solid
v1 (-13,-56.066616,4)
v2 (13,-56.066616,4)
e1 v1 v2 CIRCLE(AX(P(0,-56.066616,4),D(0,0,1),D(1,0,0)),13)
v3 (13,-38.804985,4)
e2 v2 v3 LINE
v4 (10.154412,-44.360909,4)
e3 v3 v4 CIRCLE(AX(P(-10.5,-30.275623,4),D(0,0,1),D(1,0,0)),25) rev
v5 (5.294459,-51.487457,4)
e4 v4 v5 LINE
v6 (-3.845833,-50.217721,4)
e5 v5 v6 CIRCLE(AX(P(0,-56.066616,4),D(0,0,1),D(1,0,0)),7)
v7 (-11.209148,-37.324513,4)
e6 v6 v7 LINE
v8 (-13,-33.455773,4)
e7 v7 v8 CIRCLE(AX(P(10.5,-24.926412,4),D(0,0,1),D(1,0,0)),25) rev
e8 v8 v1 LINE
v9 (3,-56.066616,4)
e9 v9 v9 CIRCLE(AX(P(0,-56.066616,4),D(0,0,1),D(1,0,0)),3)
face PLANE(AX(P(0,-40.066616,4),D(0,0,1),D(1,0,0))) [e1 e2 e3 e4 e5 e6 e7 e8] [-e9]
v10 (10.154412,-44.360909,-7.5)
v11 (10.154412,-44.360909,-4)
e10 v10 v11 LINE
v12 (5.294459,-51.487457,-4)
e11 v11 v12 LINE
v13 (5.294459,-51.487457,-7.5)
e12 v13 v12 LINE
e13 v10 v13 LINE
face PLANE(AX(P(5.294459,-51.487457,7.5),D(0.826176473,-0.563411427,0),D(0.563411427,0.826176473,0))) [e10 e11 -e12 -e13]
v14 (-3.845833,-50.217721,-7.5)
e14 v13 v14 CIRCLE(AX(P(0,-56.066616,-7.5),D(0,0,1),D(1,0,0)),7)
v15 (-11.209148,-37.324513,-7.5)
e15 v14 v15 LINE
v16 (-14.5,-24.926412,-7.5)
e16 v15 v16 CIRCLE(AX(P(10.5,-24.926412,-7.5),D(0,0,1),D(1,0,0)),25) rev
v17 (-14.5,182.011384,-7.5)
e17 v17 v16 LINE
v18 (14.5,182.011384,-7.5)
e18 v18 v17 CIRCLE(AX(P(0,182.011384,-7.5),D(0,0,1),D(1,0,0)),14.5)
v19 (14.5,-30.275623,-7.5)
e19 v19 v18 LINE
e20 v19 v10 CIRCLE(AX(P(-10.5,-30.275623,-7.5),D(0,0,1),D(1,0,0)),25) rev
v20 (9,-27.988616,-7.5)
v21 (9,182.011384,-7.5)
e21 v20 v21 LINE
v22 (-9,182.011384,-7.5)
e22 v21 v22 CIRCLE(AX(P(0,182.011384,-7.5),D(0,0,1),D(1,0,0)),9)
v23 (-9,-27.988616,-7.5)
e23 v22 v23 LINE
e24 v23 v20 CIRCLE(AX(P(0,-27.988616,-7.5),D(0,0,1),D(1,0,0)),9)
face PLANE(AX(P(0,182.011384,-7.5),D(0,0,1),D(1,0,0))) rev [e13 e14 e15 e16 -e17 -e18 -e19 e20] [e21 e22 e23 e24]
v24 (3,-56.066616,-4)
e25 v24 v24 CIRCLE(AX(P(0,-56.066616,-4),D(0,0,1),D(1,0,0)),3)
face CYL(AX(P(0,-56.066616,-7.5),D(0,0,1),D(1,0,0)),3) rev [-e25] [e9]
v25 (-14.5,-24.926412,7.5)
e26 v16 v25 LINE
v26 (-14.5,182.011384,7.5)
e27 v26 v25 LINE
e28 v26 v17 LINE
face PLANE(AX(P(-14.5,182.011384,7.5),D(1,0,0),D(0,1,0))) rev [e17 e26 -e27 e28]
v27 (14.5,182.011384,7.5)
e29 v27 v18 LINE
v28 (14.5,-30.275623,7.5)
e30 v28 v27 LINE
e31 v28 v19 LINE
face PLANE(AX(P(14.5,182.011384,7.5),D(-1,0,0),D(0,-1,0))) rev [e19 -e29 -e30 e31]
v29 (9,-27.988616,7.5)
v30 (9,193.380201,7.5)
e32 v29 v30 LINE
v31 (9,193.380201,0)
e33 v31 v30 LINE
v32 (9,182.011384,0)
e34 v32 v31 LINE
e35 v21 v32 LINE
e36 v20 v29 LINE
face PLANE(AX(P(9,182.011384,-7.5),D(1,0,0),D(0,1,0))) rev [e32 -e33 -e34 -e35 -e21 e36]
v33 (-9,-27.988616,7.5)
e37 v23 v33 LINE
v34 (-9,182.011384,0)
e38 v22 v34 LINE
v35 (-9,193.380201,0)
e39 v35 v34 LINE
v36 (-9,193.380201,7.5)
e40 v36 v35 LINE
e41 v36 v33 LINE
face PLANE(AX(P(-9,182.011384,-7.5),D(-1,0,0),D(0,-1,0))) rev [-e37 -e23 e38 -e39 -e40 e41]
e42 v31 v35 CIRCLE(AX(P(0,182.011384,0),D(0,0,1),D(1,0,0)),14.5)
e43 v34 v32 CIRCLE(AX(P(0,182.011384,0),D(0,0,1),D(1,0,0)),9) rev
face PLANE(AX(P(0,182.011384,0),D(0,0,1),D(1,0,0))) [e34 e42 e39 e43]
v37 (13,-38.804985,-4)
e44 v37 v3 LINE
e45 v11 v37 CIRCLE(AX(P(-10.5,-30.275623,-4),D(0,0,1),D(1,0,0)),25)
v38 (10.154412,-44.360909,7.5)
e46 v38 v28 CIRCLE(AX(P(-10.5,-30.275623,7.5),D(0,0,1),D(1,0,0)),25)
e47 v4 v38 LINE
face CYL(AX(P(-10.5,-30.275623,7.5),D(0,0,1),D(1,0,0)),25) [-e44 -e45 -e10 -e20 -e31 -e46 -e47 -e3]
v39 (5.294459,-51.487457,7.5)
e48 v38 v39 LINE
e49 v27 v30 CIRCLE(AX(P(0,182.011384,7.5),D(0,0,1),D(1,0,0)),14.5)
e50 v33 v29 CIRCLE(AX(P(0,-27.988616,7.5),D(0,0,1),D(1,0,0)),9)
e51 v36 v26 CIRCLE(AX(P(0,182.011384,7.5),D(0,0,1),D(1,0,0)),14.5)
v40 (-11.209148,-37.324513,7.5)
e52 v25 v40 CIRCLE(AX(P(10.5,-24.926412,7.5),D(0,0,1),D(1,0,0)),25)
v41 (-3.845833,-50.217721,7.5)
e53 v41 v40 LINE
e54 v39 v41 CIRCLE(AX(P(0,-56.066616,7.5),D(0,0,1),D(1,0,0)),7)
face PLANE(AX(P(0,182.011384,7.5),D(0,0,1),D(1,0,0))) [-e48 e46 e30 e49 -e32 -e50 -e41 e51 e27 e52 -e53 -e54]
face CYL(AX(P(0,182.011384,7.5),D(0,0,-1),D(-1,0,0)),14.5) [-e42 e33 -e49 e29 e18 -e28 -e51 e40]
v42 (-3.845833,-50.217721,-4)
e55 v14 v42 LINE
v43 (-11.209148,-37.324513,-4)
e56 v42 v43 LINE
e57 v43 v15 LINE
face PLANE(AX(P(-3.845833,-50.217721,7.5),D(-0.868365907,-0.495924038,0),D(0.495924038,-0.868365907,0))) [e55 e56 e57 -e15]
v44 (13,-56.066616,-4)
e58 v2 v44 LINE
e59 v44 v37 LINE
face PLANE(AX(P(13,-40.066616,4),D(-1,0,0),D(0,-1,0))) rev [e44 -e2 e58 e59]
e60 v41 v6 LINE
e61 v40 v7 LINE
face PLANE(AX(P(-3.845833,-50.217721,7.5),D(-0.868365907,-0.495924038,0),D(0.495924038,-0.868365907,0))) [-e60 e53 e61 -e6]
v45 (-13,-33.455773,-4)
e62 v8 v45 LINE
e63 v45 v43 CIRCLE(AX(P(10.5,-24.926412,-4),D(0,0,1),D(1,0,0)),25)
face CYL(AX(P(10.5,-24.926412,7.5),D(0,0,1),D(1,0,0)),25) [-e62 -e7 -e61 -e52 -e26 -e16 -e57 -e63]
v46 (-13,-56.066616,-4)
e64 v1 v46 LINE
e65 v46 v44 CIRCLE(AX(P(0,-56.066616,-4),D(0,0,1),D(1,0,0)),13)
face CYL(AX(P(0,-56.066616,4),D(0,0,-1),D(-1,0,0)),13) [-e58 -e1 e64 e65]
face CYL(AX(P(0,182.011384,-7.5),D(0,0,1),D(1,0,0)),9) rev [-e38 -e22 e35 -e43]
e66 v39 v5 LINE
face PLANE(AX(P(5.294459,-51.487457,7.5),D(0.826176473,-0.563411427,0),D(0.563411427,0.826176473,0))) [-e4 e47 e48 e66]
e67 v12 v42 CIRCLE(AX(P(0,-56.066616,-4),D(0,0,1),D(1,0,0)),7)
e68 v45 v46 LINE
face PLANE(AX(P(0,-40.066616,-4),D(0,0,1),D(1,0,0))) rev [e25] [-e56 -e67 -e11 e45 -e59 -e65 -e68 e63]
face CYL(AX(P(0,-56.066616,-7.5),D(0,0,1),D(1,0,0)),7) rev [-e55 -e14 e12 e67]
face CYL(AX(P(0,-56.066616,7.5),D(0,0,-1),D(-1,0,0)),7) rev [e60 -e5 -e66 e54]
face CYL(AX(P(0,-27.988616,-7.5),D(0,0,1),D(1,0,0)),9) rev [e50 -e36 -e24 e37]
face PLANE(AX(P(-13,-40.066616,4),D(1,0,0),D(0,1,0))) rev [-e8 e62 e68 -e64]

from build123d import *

# Parameters (mm, degrees)
ESTRUSIONE_ESTRUSIONE1_DEPTH = 7.5
ESTRUSIONE_ESTRUSIONE2_DEPTH = 4
TAGLIO_ESTRUSIONE1_DEPTH     = 198.380910943
TAGLIO_ESTRUSIONE2_DEPTH     = 198.380910943
RACCORDO1_R                  = 25
TAGLIO_ESTRUSIONE3_DEPTH     = 7.5
TAGLIO_ESTRUSIONE4_DEPTH     = 7.5
SCHIZZO6_R                   = 3
TAGLIO_ESTRUSIONE5_DEPTH     = 198.380910943


with BuildPart() as part:
    # Schizzo1 → Estrusione-Estrusione1 (new, symmetric)
    with BuildSketch(Plane.XY):
        with BuildLine():
            Line((14.5, 182.011383906), (14.5, -37.988616094))
            ThreePointArc((14.5, -37.988616094), (0, -52.488616094), (-14.5, -37.988616094))
            Line((-14.5, -37.988616094), (-14.5, 182.011383906))
            ThreePointArc((-14.5, 182.011383906), (0, 196.511383906), (14.5, 182.011383906))
        make_face()
    extrude(amount=ESTRUSIONE_ESTRUSIONE1_DEPTH, both=True)

    # Schizzo2 → Estrusione-Estrusione2 (add, symmetric)
    with BuildSketch(Plane.XY):
        with BuildLine():
            Line((13, -40.066616094), (13, -56.066616094))
            ThreePointArc((13, -56.066616094), (0, -69.066616094), (-13, -56.066616094))
            Line((-13, -56.066616094), (-13, -40.066616094))
            ThreePointArc((-13, -40.066616094), (0, -27.066616094), (13, -40.066616094))
        make_face()
    extrude(amount=ESTRUSIONE_ESTRUSIONE2_DEPTH, both=True)

    # Schizzo4 → Taglio-Estrusione1 (cut, through all)
    with BuildSketch(Plane.XY.offset(4)):
        with BuildLine():
            Line((5.29445937, -51.487456784), (14.5, -37.988616094))
            Line((14.5, -37.988616094), (21.494330869, -44.738036439))
            Line((21.494330869, -44.738036439), (5.386515672, -60.537124892))
            ThreePointArc((5.386515672, -60.537124892), (0.071202698, -63.066253954), (-5.29445937, -60.645775404))
            Line((-5.29445937, -60.645775404), (-28.596127717, -39.453615031))
            Line((-28.596127717, -39.453615031), (-14.5, -31.562211214))
            Line((-14.5, -31.562211214), (-3.845832517, -50.217721134))
            ThreePointArc((-3.845832517, -50.217721134), (0.963165144, -49.133196093), (5.29445937, -51.487456784))
        make_face()
    taglio_estrusione1 = extrude(amount=TAGLIO_ESTRUSIONE1_DEPTH, mode=Mode.SUBTRACT)

    # Specchia1: Taglio-Estrusione1 across plane
    add(taglio_estrusione1.mirror(Plane.XY), mode=Mode.SUBTRACT)

    # Schizzo5 → Taglio-Estrusione2 (cut, through all)
    with BuildSketch(Plane.XY.offset(4)):
        Polygon((-13, -44.411232383), (-13, -34.188720036), (-15.056335757, -30.588064032), (-15.056335757, -43.619366988), align=None)
        Polygon((13, -44.411232383), (13, -40.188189356), (17.407959402, -33.724436261), (17.407959402, -44.411232383), align=None)
    extrude(amount=-TAGLIO_ESTRUSIONE2_DEPTH, mode=Mode.SUBTRACT)

    # Raccordo1
    # the kernel refuses this fillet: 25 mm, written as the material it takes off along each edge
    with BuildSketch(Plane(origin=(-14.5, -31.562211214, -24.089497944), x_dir=(0.4959240379913526, -0.8683659070589721, 0), z_dir=(0, 0, 1))) as raccordo1_piece_1_section:
        with BuildLine():
            CenterArc((RACCORDO1_R * 0.26543196711, RACCORDO1_R), RACCORDO1_R, 240.269299078, 29.730700922)
            Line((-RACCORDO1_R * 0.230492070882, RACCORDO1_R * 0.131634092941), (0, 0))
            Line((0, 0), (RACCORDO1_R * 0.26543196711, 0))
        make_face()
    raccordo1_piece_1 = extrude(amount=48.178995889, mode=Mode.PRIVATE)
    raccordo1_piece_1 = split(raccordo1_piece_1, bisect_by=Plane(origin=(-13, -35.788331904, -14.044748972), z_dir=(1, 0, 0)), keep=Keep.TOP, mode=Mode.PRIVATE)
    raccordo1_piece_1 = split(raccordo1_piece_1, bisect_by=Plane(origin=(-12.28179921, -35.788331904, -4), z_dir=(0, 0, -1)), keep=Keep.TOP, mode=Mode.PRIVATE)
    add(raccordo1_piece_1, mode=Mode.SUBTRACT)
    with BuildSketch(Plane(origin=(-14.5, -31.562211214, -24.089497944), x_dir=(0.4959240379913526, -0.8683659070589721, 0), z_dir=(0, 0, 1))) as raccordo1_piece_2_section:
        with BuildLine():
            CenterArc((RACCORDO1_R * 0.26543196711, RACCORDO1_R), RACCORDO1_R, 240.269299078, 29.730700922)
            Line((-RACCORDO1_R * 0.230492070882, RACCORDO1_R * 0.131634092941), (0, 0))
            Line((0, 0), (RACCORDO1_R * 0.26543196711, 0))
        make_face()
    raccordo1_piece_2 = extrude(amount=48.178995889, mode=Mode.PRIVATE)
    raccordo1_piece_2 = split(raccordo1_piece_2, bisect_by=Plane(origin=(-13, -30.370530988, -14.044748972), z_dir=(-1, 0, 0)), keep=Keep.TOP, mode=Mode.PRIVATE)
    raccordo1_piece_2 = split(raccordo1_piece_2, bisect_by=Plane(origin=(-14.266276842, -30.370530988, -4), z_dir=(0, 0, -1)), keep=Keep.TOP, mode=Mode.PRIVATE)
    add(raccordo1_piece_2, mode=Mode.SUBTRACT)
    with BuildSketch(Plane(origin=(-14.5, -31.562211214, -24.089497944), x_dir=(0.4959240379913526, -0.8683659070589721, 0), z_dir=(0, 0, 1))) as raccordo1_piece_3_section:
        with BuildLine():
            CenterArc((RACCORDO1_R * 0.26543196711, RACCORDO1_R), RACCORDO1_R, 240.269299078, 29.730700922)
            Line((-RACCORDO1_R * 0.230492070882, RACCORDO1_R * 0.131634092941), (0, 0))
            Line((0, 0), (RACCORDO1_R * 0.26543196711, 0))
        make_face()
    raccordo1_piece_3 = extrude(amount=48.178995889, mode=Mode.PRIVATE)
    raccordo1_piece_3 = split(raccordo1_piece_3, bisect_by=Plane(origin=(-14.266276842, -30.370530988, 4), z_dir=(0, 0, -1)), keep=Keep.TOP, mode=Mode.PRIVATE)
    raccordo1_piece_3 = split(raccordo1_piece_3, bisect_by=Plane(origin=(-13, -30.370530988, 0), z_dir=(-1, 0, 0)), keep=Keep.TOP, mode=Mode.PRIVATE)
    raccordo1_piece_3 = split(raccordo1_piece_3, bisect_by=Plane(origin=(-14.266276842, -30.370530988, -4), z_dir=(0, 0, 1)), keep=Keep.TOP, mode=Mode.PRIVATE)
    add(raccordo1_piece_3, mode=Mode.SUBTRACT)
    with BuildSketch(Plane(origin=(-14.5, -31.562211214, -24.089497944), x_dir=(0.4959240379913526, -0.8683659070589721, 0), z_dir=(0, 0, 1))) as raccordo1_piece_4_section:
        with BuildLine():
            CenterArc((RACCORDO1_R * 0.26543196711, RACCORDO1_R), RACCORDO1_R, 240.269299078, 29.730700922)
            Line((-RACCORDO1_R * 0.230492070882, RACCORDO1_R * 0.131634092941), (0, 0))
            Line((0, 0), (RACCORDO1_R * 0.26543196711, 0))
        make_face()
    raccordo1_piece_4 = extrude(amount=48.178995889, mode=Mode.PRIVATE)
    raccordo1_piece_4 = split(raccordo1_piece_4, bisect_by=Plane(origin=(-12.28179921, -35.788331904, 4), z_dir=(0, 0, 1)), keep=Keep.TOP, mode=Mode.PRIVATE)
    raccordo1_piece_4 = split(raccordo1_piece_4, bisect_by=Plane(origin=(-13, -35.788331904, 14.044748972), z_dir=(1, 0, 0)), keep=Keep.TOP, mode=Mode.PRIVATE)
    add(raccordo1_piece_4, mode=Mode.SUBTRACT)
    with BuildSketch(Plane(origin=(-14.5, -31.562211214, -24.089497944), x_dir=(0.4959240379913526, -0.8683659070589721, 0), z_dir=(0, 0, 1))) as raccordo1_piece_5_section:
        with BuildLine():
            CenterArc((RACCORDO1_R * 0.26543196711, RACCORDO1_R), RACCORDO1_R, 240.269299078, 29.730700922)
            Line((-RACCORDO1_R * 0.230492070882, RACCORDO1_R * 0.131634092941), (0, 0))
            Line((0, 0), (RACCORDO1_R * 0.26543196711, 0))
        make_face()
    raccordo1_piece_5 = extrude(amount=48.178995889, mode=Mode.PRIVATE)
    raccordo1_piece_5 = split(raccordo1_piece_5, bisect_by=Plane(origin=(-14.266276842, -30.370530988, 4), z_dir=(0, 0, 1)), keep=Keep.TOP, mode=Mode.PRIVATE)
    raccordo1_piece_5 = split(raccordo1_piece_5, bisect_by=Plane(origin=(-13, -30.370530988, 14.044748972), z_dir=(-1, 0, 0)), keep=Keep.TOP, mode=Mode.PRIVATE)
    add(raccordo1_piece_5, mode=Mode.SUBTRACT)
    with BuildSketch(Plane(origin=(14.5, -37.988616094, 26.782481556), x_dir=(0, 1, 0), z_dir=(0, 0, -1))) as raccordo1_piece_6_section:
        with BuildLine():
            CenterArc((RACCORDO1_R * 0.308519704891, -RACCORDO1_R), RACCORDO1_R, 90, 34.292050498)
            Line((-RACCORDO1_R * 0.254891721625, -RACCORDO1_R * 0.173823527041), (0, 0))
            Line((0, 0), (RACCORDO1_R * 0.308519704891, 0))
        make_face()
    raccordo1_piece_6 = extrude(amount=53.564963111, mode=Mode.PRIVATE)
    raccordo1_piece_6 = split(raccordo1_piece_6, bisect_by=Plane(origin=(14.242102238, -36.251699178, 4), z_dir=(0, 0, 1)), keep=Keep.TOP, mode=Mode.PRIVATE)
    raccordo1_piece_6 = split(raccordo1_piece_6, bisect_by=Plane(origin=(13, -36.251699178, 15.391240778), z_dir=(1, 0, 0)), keep=Keep.TOP, mode=Mode.PRIVATE)
    add(raccordo1_piece_6, mode=Mode.SUBTRACT)
    with BuildSketch(Plane(origin=(14.5, -37.988616094, 26.782481556), x_dir=(0, 1, 0), z_dir=(0, 0, -1))) as raccordo1_piece_7_section:
        with BuildLine():
            CenterArc((RACCORDO1_R * 0.308519704891, -RACCORDO1_R), RACCORDO1_R, 90, 34.292050498)
            Line((-RACCORDO1_R * 0.254891721625, -RACCORDO1_R * 0.173823527041), (0, 0))
            Line((0, 0), (RACCORDO1_R * 0.308519704891, 0))
        make_face()
    raccordo1_piece_7 = extrude(amount=53.564963111, mode=Mode.PRIVATE)
    raccordo1_piece_7 = split(raccordo1_piece_7, bisect_by=Plane(origin=(11.895384145, -41.966992208, 4), z_dir=(0, 0, 1)), keep=Keep.TOP, mode=Mode.PRIVATE)
    raccordo1_piece_7 = split(raccordo1_piece_7, bisect_by=Plane(origin=(13, -41.966992208, 15.391240778), z_dir=(-1, 0, 0)), keep=Keep.TOP, mode=Mode.PRIVATE)
    add(raccordo1_piece_7, mode=Mode.SUBTRACT)
    with BuildSketch(Plane(origin=(14.5, -37.988616094, 26.782481556), x_dir=(0, 1, 0), z_dir=(0, 0, -1))) as raccordo1_piece_8_section:
        with BuildLine():
            CenterArc((RACCORDO1_R * 0.308519704891, -RACCORDO1_R), RACCORDO1_R, 90, 34.292050498)
            Line((-RACCORDO1_R * 0.254891721625, -RACCORDO1_R * 0.173823527041), (0, 0))
            Line((0, 0), (RACCORDO1_R * 0.308519704891, 0))
        make_face()
    raccordo1_piece_8 = extrude(amount=53.564963111, mode=Mode.PRIVATE)
    raccordo1_piece_8 = split(raccordo1_piece_8, bisect_by=Plane(origin=(14.242102238, -36.251699178, 4), z_dir=(0, 0, -1)), keep=Keep.TOP, mode=Mode.PRIVATE)
    raccordo1_piece_8 = split(raccordo1_piece_8, bisect_by=Plane(origin=(14.242102238, -36.251699178, -4), z_dir=(0, 0, 1)), keep=Keep.TOP, mode=Mode.PRIVATE)
    raccordo1_piece_8 = split(raccordo1_piece_8, bisect_by=Plane(origin=(13, -36.251699178, 0), z_dir=(1, 0, 0)), keep=Keep.TOP, mode=Mode.PRIVATE)
    add(raccordo1_piece_8, mode=Mode.SUBTRACT)
    with BuildSketch(Plane(origin=(14.5, -37.988616094, 26.782481556), x_dir=(0, 1, 0), z_dir=(0, 0, -1))) as raccordo1_piece_9_section:
        with BuildLine():
            CenterArc((RACCORDO1_R * 0.308519704891, -RACCORDO1_R), RACCORDO1_R, 90, 34.292050498)
            Line((-RACCORDO1_R * 0.254891721625, -RACCORDO1_R * 0.173823527041), (0, 0))
            Line((0, 0), (RACCORDO1_R * 0.308519704891, 0))
        make_face()
    raccordo1_piece_9 = extrude(amount=53.564963111, mode=Mode.PRIVATE)
    raccordo1_piece_9 = split(raccordo1_piece_9, bisect_by=Plane(origin=(14.242102238, -36.251699178, -4), z_dir=(0, 0, -1)), keep=Keep.TOP, mode=Mode.PRIVATE)
    raccordo1_piece_9 = split(raccordo1_piece_9, bisect_by=Plane(origin=(13, -36.251699178, -15.391240778), z_dir=(1, 0, 0)), keep=Keep.TOP, mode=Mode.PRIVATE)
    add(raccordo1_piece_9, mode=Mode.SUBTRACT)
    with BuildSketch(Plane(origin=(14.5, -37.988616094, 26.782481556), x_dir=(0, 1, 0), z_dir=(0, 0, -1))) as raccordo1_piece_10_section:
        with BuildLine():
            CenterArc((RACCORDO1_R * 0.308519704891, -RACCORDO1_R), RACCORDO1_R, 90, 34.292050498)
            Line((-RACCORDO1_R * 0.254891721625, -RACCORDO1_R * 0.173823527041), (0, 0))
            Line((0, 0), (RACCORDO1_R * 0.308519704891, 0))
        make_face()
    raccordo1_piece_10 = extrude(amount=53.564963111, mode=Mode.PRIVATE)
    raccordo1_piece_10 = split(raccordo1_piece_10, bisect_by=Plane(origin=(11.895384145, -41.966992208, -4), z_dir=(0, 0, -1)), keep=Keep.TOP, mode=Mode.PRIVATE)
    raccordo1_piece_10 = split(raccordo1_piece_10, bisect_by=Plane(origin=(13, -41.966992208, -15.391240778), z_dir=(-1, 0, 0)), keep=Keep.TOP, mode=Mode.PRIVATE)
    add(raccordo1_piece_10, mode=Mode.SUBTRACT)

    # Schizzo8 → Taglio-Estrusione3 (cut, symmetric)
    with BuildSketch(Plane.XY):
        with BuildLine():
            Line((9, 182.011383906), (9, -27.988616094))
            ThreePointArc((9, -27.988616094), (0, -36.988616094), (-9, -27.988616094))
            Line((-9, -27.988616094), (-9, 182.011383906))
            ThreePointArc((-9, 182.011383906), (0, 191.011383906), (9, 182.011383906))
        make_face()
    extrude(amount=TAGLIO_ESTRUSIONE3_DEPTH, both=True, mode=Mode.SUBTRACT)

    # Schizzo9 → Taglio-Estrusione4 (cut)
    with BuildSketch(Plane.XY.offset(7.5)):
        with BuildLine():
            Line((-9, 182.011383906), (-9, 202.011383906))
            ThreePointArc((-9, 202.011383906), (0, 211.011383906), (9, 202.011383906))
            Line((9, 202.011383906), (9, 182.011383906))
            ThreePointArc((9, 182.011383906), (0, 173.011383906), (-9, 182.011383906))
        make_face()
    extrude(amount=-TAGLIO_ESTRUSIONE4_DEPTH, mode=Mode.SUBTRACT)

    # Schizzo6 → Taglio-Estrusione5 (cut, through all)
    with BuildSketch(Plane.XY.offset(4)):
        with Locations((0, -56.066616094)):
            Circle(SCHIZZO6_R)
    extrude(amount=-TAGLIO_ESTRUSIONE5_DEPTH, mode=Mode.SUBTRACT)


solid = part.part
